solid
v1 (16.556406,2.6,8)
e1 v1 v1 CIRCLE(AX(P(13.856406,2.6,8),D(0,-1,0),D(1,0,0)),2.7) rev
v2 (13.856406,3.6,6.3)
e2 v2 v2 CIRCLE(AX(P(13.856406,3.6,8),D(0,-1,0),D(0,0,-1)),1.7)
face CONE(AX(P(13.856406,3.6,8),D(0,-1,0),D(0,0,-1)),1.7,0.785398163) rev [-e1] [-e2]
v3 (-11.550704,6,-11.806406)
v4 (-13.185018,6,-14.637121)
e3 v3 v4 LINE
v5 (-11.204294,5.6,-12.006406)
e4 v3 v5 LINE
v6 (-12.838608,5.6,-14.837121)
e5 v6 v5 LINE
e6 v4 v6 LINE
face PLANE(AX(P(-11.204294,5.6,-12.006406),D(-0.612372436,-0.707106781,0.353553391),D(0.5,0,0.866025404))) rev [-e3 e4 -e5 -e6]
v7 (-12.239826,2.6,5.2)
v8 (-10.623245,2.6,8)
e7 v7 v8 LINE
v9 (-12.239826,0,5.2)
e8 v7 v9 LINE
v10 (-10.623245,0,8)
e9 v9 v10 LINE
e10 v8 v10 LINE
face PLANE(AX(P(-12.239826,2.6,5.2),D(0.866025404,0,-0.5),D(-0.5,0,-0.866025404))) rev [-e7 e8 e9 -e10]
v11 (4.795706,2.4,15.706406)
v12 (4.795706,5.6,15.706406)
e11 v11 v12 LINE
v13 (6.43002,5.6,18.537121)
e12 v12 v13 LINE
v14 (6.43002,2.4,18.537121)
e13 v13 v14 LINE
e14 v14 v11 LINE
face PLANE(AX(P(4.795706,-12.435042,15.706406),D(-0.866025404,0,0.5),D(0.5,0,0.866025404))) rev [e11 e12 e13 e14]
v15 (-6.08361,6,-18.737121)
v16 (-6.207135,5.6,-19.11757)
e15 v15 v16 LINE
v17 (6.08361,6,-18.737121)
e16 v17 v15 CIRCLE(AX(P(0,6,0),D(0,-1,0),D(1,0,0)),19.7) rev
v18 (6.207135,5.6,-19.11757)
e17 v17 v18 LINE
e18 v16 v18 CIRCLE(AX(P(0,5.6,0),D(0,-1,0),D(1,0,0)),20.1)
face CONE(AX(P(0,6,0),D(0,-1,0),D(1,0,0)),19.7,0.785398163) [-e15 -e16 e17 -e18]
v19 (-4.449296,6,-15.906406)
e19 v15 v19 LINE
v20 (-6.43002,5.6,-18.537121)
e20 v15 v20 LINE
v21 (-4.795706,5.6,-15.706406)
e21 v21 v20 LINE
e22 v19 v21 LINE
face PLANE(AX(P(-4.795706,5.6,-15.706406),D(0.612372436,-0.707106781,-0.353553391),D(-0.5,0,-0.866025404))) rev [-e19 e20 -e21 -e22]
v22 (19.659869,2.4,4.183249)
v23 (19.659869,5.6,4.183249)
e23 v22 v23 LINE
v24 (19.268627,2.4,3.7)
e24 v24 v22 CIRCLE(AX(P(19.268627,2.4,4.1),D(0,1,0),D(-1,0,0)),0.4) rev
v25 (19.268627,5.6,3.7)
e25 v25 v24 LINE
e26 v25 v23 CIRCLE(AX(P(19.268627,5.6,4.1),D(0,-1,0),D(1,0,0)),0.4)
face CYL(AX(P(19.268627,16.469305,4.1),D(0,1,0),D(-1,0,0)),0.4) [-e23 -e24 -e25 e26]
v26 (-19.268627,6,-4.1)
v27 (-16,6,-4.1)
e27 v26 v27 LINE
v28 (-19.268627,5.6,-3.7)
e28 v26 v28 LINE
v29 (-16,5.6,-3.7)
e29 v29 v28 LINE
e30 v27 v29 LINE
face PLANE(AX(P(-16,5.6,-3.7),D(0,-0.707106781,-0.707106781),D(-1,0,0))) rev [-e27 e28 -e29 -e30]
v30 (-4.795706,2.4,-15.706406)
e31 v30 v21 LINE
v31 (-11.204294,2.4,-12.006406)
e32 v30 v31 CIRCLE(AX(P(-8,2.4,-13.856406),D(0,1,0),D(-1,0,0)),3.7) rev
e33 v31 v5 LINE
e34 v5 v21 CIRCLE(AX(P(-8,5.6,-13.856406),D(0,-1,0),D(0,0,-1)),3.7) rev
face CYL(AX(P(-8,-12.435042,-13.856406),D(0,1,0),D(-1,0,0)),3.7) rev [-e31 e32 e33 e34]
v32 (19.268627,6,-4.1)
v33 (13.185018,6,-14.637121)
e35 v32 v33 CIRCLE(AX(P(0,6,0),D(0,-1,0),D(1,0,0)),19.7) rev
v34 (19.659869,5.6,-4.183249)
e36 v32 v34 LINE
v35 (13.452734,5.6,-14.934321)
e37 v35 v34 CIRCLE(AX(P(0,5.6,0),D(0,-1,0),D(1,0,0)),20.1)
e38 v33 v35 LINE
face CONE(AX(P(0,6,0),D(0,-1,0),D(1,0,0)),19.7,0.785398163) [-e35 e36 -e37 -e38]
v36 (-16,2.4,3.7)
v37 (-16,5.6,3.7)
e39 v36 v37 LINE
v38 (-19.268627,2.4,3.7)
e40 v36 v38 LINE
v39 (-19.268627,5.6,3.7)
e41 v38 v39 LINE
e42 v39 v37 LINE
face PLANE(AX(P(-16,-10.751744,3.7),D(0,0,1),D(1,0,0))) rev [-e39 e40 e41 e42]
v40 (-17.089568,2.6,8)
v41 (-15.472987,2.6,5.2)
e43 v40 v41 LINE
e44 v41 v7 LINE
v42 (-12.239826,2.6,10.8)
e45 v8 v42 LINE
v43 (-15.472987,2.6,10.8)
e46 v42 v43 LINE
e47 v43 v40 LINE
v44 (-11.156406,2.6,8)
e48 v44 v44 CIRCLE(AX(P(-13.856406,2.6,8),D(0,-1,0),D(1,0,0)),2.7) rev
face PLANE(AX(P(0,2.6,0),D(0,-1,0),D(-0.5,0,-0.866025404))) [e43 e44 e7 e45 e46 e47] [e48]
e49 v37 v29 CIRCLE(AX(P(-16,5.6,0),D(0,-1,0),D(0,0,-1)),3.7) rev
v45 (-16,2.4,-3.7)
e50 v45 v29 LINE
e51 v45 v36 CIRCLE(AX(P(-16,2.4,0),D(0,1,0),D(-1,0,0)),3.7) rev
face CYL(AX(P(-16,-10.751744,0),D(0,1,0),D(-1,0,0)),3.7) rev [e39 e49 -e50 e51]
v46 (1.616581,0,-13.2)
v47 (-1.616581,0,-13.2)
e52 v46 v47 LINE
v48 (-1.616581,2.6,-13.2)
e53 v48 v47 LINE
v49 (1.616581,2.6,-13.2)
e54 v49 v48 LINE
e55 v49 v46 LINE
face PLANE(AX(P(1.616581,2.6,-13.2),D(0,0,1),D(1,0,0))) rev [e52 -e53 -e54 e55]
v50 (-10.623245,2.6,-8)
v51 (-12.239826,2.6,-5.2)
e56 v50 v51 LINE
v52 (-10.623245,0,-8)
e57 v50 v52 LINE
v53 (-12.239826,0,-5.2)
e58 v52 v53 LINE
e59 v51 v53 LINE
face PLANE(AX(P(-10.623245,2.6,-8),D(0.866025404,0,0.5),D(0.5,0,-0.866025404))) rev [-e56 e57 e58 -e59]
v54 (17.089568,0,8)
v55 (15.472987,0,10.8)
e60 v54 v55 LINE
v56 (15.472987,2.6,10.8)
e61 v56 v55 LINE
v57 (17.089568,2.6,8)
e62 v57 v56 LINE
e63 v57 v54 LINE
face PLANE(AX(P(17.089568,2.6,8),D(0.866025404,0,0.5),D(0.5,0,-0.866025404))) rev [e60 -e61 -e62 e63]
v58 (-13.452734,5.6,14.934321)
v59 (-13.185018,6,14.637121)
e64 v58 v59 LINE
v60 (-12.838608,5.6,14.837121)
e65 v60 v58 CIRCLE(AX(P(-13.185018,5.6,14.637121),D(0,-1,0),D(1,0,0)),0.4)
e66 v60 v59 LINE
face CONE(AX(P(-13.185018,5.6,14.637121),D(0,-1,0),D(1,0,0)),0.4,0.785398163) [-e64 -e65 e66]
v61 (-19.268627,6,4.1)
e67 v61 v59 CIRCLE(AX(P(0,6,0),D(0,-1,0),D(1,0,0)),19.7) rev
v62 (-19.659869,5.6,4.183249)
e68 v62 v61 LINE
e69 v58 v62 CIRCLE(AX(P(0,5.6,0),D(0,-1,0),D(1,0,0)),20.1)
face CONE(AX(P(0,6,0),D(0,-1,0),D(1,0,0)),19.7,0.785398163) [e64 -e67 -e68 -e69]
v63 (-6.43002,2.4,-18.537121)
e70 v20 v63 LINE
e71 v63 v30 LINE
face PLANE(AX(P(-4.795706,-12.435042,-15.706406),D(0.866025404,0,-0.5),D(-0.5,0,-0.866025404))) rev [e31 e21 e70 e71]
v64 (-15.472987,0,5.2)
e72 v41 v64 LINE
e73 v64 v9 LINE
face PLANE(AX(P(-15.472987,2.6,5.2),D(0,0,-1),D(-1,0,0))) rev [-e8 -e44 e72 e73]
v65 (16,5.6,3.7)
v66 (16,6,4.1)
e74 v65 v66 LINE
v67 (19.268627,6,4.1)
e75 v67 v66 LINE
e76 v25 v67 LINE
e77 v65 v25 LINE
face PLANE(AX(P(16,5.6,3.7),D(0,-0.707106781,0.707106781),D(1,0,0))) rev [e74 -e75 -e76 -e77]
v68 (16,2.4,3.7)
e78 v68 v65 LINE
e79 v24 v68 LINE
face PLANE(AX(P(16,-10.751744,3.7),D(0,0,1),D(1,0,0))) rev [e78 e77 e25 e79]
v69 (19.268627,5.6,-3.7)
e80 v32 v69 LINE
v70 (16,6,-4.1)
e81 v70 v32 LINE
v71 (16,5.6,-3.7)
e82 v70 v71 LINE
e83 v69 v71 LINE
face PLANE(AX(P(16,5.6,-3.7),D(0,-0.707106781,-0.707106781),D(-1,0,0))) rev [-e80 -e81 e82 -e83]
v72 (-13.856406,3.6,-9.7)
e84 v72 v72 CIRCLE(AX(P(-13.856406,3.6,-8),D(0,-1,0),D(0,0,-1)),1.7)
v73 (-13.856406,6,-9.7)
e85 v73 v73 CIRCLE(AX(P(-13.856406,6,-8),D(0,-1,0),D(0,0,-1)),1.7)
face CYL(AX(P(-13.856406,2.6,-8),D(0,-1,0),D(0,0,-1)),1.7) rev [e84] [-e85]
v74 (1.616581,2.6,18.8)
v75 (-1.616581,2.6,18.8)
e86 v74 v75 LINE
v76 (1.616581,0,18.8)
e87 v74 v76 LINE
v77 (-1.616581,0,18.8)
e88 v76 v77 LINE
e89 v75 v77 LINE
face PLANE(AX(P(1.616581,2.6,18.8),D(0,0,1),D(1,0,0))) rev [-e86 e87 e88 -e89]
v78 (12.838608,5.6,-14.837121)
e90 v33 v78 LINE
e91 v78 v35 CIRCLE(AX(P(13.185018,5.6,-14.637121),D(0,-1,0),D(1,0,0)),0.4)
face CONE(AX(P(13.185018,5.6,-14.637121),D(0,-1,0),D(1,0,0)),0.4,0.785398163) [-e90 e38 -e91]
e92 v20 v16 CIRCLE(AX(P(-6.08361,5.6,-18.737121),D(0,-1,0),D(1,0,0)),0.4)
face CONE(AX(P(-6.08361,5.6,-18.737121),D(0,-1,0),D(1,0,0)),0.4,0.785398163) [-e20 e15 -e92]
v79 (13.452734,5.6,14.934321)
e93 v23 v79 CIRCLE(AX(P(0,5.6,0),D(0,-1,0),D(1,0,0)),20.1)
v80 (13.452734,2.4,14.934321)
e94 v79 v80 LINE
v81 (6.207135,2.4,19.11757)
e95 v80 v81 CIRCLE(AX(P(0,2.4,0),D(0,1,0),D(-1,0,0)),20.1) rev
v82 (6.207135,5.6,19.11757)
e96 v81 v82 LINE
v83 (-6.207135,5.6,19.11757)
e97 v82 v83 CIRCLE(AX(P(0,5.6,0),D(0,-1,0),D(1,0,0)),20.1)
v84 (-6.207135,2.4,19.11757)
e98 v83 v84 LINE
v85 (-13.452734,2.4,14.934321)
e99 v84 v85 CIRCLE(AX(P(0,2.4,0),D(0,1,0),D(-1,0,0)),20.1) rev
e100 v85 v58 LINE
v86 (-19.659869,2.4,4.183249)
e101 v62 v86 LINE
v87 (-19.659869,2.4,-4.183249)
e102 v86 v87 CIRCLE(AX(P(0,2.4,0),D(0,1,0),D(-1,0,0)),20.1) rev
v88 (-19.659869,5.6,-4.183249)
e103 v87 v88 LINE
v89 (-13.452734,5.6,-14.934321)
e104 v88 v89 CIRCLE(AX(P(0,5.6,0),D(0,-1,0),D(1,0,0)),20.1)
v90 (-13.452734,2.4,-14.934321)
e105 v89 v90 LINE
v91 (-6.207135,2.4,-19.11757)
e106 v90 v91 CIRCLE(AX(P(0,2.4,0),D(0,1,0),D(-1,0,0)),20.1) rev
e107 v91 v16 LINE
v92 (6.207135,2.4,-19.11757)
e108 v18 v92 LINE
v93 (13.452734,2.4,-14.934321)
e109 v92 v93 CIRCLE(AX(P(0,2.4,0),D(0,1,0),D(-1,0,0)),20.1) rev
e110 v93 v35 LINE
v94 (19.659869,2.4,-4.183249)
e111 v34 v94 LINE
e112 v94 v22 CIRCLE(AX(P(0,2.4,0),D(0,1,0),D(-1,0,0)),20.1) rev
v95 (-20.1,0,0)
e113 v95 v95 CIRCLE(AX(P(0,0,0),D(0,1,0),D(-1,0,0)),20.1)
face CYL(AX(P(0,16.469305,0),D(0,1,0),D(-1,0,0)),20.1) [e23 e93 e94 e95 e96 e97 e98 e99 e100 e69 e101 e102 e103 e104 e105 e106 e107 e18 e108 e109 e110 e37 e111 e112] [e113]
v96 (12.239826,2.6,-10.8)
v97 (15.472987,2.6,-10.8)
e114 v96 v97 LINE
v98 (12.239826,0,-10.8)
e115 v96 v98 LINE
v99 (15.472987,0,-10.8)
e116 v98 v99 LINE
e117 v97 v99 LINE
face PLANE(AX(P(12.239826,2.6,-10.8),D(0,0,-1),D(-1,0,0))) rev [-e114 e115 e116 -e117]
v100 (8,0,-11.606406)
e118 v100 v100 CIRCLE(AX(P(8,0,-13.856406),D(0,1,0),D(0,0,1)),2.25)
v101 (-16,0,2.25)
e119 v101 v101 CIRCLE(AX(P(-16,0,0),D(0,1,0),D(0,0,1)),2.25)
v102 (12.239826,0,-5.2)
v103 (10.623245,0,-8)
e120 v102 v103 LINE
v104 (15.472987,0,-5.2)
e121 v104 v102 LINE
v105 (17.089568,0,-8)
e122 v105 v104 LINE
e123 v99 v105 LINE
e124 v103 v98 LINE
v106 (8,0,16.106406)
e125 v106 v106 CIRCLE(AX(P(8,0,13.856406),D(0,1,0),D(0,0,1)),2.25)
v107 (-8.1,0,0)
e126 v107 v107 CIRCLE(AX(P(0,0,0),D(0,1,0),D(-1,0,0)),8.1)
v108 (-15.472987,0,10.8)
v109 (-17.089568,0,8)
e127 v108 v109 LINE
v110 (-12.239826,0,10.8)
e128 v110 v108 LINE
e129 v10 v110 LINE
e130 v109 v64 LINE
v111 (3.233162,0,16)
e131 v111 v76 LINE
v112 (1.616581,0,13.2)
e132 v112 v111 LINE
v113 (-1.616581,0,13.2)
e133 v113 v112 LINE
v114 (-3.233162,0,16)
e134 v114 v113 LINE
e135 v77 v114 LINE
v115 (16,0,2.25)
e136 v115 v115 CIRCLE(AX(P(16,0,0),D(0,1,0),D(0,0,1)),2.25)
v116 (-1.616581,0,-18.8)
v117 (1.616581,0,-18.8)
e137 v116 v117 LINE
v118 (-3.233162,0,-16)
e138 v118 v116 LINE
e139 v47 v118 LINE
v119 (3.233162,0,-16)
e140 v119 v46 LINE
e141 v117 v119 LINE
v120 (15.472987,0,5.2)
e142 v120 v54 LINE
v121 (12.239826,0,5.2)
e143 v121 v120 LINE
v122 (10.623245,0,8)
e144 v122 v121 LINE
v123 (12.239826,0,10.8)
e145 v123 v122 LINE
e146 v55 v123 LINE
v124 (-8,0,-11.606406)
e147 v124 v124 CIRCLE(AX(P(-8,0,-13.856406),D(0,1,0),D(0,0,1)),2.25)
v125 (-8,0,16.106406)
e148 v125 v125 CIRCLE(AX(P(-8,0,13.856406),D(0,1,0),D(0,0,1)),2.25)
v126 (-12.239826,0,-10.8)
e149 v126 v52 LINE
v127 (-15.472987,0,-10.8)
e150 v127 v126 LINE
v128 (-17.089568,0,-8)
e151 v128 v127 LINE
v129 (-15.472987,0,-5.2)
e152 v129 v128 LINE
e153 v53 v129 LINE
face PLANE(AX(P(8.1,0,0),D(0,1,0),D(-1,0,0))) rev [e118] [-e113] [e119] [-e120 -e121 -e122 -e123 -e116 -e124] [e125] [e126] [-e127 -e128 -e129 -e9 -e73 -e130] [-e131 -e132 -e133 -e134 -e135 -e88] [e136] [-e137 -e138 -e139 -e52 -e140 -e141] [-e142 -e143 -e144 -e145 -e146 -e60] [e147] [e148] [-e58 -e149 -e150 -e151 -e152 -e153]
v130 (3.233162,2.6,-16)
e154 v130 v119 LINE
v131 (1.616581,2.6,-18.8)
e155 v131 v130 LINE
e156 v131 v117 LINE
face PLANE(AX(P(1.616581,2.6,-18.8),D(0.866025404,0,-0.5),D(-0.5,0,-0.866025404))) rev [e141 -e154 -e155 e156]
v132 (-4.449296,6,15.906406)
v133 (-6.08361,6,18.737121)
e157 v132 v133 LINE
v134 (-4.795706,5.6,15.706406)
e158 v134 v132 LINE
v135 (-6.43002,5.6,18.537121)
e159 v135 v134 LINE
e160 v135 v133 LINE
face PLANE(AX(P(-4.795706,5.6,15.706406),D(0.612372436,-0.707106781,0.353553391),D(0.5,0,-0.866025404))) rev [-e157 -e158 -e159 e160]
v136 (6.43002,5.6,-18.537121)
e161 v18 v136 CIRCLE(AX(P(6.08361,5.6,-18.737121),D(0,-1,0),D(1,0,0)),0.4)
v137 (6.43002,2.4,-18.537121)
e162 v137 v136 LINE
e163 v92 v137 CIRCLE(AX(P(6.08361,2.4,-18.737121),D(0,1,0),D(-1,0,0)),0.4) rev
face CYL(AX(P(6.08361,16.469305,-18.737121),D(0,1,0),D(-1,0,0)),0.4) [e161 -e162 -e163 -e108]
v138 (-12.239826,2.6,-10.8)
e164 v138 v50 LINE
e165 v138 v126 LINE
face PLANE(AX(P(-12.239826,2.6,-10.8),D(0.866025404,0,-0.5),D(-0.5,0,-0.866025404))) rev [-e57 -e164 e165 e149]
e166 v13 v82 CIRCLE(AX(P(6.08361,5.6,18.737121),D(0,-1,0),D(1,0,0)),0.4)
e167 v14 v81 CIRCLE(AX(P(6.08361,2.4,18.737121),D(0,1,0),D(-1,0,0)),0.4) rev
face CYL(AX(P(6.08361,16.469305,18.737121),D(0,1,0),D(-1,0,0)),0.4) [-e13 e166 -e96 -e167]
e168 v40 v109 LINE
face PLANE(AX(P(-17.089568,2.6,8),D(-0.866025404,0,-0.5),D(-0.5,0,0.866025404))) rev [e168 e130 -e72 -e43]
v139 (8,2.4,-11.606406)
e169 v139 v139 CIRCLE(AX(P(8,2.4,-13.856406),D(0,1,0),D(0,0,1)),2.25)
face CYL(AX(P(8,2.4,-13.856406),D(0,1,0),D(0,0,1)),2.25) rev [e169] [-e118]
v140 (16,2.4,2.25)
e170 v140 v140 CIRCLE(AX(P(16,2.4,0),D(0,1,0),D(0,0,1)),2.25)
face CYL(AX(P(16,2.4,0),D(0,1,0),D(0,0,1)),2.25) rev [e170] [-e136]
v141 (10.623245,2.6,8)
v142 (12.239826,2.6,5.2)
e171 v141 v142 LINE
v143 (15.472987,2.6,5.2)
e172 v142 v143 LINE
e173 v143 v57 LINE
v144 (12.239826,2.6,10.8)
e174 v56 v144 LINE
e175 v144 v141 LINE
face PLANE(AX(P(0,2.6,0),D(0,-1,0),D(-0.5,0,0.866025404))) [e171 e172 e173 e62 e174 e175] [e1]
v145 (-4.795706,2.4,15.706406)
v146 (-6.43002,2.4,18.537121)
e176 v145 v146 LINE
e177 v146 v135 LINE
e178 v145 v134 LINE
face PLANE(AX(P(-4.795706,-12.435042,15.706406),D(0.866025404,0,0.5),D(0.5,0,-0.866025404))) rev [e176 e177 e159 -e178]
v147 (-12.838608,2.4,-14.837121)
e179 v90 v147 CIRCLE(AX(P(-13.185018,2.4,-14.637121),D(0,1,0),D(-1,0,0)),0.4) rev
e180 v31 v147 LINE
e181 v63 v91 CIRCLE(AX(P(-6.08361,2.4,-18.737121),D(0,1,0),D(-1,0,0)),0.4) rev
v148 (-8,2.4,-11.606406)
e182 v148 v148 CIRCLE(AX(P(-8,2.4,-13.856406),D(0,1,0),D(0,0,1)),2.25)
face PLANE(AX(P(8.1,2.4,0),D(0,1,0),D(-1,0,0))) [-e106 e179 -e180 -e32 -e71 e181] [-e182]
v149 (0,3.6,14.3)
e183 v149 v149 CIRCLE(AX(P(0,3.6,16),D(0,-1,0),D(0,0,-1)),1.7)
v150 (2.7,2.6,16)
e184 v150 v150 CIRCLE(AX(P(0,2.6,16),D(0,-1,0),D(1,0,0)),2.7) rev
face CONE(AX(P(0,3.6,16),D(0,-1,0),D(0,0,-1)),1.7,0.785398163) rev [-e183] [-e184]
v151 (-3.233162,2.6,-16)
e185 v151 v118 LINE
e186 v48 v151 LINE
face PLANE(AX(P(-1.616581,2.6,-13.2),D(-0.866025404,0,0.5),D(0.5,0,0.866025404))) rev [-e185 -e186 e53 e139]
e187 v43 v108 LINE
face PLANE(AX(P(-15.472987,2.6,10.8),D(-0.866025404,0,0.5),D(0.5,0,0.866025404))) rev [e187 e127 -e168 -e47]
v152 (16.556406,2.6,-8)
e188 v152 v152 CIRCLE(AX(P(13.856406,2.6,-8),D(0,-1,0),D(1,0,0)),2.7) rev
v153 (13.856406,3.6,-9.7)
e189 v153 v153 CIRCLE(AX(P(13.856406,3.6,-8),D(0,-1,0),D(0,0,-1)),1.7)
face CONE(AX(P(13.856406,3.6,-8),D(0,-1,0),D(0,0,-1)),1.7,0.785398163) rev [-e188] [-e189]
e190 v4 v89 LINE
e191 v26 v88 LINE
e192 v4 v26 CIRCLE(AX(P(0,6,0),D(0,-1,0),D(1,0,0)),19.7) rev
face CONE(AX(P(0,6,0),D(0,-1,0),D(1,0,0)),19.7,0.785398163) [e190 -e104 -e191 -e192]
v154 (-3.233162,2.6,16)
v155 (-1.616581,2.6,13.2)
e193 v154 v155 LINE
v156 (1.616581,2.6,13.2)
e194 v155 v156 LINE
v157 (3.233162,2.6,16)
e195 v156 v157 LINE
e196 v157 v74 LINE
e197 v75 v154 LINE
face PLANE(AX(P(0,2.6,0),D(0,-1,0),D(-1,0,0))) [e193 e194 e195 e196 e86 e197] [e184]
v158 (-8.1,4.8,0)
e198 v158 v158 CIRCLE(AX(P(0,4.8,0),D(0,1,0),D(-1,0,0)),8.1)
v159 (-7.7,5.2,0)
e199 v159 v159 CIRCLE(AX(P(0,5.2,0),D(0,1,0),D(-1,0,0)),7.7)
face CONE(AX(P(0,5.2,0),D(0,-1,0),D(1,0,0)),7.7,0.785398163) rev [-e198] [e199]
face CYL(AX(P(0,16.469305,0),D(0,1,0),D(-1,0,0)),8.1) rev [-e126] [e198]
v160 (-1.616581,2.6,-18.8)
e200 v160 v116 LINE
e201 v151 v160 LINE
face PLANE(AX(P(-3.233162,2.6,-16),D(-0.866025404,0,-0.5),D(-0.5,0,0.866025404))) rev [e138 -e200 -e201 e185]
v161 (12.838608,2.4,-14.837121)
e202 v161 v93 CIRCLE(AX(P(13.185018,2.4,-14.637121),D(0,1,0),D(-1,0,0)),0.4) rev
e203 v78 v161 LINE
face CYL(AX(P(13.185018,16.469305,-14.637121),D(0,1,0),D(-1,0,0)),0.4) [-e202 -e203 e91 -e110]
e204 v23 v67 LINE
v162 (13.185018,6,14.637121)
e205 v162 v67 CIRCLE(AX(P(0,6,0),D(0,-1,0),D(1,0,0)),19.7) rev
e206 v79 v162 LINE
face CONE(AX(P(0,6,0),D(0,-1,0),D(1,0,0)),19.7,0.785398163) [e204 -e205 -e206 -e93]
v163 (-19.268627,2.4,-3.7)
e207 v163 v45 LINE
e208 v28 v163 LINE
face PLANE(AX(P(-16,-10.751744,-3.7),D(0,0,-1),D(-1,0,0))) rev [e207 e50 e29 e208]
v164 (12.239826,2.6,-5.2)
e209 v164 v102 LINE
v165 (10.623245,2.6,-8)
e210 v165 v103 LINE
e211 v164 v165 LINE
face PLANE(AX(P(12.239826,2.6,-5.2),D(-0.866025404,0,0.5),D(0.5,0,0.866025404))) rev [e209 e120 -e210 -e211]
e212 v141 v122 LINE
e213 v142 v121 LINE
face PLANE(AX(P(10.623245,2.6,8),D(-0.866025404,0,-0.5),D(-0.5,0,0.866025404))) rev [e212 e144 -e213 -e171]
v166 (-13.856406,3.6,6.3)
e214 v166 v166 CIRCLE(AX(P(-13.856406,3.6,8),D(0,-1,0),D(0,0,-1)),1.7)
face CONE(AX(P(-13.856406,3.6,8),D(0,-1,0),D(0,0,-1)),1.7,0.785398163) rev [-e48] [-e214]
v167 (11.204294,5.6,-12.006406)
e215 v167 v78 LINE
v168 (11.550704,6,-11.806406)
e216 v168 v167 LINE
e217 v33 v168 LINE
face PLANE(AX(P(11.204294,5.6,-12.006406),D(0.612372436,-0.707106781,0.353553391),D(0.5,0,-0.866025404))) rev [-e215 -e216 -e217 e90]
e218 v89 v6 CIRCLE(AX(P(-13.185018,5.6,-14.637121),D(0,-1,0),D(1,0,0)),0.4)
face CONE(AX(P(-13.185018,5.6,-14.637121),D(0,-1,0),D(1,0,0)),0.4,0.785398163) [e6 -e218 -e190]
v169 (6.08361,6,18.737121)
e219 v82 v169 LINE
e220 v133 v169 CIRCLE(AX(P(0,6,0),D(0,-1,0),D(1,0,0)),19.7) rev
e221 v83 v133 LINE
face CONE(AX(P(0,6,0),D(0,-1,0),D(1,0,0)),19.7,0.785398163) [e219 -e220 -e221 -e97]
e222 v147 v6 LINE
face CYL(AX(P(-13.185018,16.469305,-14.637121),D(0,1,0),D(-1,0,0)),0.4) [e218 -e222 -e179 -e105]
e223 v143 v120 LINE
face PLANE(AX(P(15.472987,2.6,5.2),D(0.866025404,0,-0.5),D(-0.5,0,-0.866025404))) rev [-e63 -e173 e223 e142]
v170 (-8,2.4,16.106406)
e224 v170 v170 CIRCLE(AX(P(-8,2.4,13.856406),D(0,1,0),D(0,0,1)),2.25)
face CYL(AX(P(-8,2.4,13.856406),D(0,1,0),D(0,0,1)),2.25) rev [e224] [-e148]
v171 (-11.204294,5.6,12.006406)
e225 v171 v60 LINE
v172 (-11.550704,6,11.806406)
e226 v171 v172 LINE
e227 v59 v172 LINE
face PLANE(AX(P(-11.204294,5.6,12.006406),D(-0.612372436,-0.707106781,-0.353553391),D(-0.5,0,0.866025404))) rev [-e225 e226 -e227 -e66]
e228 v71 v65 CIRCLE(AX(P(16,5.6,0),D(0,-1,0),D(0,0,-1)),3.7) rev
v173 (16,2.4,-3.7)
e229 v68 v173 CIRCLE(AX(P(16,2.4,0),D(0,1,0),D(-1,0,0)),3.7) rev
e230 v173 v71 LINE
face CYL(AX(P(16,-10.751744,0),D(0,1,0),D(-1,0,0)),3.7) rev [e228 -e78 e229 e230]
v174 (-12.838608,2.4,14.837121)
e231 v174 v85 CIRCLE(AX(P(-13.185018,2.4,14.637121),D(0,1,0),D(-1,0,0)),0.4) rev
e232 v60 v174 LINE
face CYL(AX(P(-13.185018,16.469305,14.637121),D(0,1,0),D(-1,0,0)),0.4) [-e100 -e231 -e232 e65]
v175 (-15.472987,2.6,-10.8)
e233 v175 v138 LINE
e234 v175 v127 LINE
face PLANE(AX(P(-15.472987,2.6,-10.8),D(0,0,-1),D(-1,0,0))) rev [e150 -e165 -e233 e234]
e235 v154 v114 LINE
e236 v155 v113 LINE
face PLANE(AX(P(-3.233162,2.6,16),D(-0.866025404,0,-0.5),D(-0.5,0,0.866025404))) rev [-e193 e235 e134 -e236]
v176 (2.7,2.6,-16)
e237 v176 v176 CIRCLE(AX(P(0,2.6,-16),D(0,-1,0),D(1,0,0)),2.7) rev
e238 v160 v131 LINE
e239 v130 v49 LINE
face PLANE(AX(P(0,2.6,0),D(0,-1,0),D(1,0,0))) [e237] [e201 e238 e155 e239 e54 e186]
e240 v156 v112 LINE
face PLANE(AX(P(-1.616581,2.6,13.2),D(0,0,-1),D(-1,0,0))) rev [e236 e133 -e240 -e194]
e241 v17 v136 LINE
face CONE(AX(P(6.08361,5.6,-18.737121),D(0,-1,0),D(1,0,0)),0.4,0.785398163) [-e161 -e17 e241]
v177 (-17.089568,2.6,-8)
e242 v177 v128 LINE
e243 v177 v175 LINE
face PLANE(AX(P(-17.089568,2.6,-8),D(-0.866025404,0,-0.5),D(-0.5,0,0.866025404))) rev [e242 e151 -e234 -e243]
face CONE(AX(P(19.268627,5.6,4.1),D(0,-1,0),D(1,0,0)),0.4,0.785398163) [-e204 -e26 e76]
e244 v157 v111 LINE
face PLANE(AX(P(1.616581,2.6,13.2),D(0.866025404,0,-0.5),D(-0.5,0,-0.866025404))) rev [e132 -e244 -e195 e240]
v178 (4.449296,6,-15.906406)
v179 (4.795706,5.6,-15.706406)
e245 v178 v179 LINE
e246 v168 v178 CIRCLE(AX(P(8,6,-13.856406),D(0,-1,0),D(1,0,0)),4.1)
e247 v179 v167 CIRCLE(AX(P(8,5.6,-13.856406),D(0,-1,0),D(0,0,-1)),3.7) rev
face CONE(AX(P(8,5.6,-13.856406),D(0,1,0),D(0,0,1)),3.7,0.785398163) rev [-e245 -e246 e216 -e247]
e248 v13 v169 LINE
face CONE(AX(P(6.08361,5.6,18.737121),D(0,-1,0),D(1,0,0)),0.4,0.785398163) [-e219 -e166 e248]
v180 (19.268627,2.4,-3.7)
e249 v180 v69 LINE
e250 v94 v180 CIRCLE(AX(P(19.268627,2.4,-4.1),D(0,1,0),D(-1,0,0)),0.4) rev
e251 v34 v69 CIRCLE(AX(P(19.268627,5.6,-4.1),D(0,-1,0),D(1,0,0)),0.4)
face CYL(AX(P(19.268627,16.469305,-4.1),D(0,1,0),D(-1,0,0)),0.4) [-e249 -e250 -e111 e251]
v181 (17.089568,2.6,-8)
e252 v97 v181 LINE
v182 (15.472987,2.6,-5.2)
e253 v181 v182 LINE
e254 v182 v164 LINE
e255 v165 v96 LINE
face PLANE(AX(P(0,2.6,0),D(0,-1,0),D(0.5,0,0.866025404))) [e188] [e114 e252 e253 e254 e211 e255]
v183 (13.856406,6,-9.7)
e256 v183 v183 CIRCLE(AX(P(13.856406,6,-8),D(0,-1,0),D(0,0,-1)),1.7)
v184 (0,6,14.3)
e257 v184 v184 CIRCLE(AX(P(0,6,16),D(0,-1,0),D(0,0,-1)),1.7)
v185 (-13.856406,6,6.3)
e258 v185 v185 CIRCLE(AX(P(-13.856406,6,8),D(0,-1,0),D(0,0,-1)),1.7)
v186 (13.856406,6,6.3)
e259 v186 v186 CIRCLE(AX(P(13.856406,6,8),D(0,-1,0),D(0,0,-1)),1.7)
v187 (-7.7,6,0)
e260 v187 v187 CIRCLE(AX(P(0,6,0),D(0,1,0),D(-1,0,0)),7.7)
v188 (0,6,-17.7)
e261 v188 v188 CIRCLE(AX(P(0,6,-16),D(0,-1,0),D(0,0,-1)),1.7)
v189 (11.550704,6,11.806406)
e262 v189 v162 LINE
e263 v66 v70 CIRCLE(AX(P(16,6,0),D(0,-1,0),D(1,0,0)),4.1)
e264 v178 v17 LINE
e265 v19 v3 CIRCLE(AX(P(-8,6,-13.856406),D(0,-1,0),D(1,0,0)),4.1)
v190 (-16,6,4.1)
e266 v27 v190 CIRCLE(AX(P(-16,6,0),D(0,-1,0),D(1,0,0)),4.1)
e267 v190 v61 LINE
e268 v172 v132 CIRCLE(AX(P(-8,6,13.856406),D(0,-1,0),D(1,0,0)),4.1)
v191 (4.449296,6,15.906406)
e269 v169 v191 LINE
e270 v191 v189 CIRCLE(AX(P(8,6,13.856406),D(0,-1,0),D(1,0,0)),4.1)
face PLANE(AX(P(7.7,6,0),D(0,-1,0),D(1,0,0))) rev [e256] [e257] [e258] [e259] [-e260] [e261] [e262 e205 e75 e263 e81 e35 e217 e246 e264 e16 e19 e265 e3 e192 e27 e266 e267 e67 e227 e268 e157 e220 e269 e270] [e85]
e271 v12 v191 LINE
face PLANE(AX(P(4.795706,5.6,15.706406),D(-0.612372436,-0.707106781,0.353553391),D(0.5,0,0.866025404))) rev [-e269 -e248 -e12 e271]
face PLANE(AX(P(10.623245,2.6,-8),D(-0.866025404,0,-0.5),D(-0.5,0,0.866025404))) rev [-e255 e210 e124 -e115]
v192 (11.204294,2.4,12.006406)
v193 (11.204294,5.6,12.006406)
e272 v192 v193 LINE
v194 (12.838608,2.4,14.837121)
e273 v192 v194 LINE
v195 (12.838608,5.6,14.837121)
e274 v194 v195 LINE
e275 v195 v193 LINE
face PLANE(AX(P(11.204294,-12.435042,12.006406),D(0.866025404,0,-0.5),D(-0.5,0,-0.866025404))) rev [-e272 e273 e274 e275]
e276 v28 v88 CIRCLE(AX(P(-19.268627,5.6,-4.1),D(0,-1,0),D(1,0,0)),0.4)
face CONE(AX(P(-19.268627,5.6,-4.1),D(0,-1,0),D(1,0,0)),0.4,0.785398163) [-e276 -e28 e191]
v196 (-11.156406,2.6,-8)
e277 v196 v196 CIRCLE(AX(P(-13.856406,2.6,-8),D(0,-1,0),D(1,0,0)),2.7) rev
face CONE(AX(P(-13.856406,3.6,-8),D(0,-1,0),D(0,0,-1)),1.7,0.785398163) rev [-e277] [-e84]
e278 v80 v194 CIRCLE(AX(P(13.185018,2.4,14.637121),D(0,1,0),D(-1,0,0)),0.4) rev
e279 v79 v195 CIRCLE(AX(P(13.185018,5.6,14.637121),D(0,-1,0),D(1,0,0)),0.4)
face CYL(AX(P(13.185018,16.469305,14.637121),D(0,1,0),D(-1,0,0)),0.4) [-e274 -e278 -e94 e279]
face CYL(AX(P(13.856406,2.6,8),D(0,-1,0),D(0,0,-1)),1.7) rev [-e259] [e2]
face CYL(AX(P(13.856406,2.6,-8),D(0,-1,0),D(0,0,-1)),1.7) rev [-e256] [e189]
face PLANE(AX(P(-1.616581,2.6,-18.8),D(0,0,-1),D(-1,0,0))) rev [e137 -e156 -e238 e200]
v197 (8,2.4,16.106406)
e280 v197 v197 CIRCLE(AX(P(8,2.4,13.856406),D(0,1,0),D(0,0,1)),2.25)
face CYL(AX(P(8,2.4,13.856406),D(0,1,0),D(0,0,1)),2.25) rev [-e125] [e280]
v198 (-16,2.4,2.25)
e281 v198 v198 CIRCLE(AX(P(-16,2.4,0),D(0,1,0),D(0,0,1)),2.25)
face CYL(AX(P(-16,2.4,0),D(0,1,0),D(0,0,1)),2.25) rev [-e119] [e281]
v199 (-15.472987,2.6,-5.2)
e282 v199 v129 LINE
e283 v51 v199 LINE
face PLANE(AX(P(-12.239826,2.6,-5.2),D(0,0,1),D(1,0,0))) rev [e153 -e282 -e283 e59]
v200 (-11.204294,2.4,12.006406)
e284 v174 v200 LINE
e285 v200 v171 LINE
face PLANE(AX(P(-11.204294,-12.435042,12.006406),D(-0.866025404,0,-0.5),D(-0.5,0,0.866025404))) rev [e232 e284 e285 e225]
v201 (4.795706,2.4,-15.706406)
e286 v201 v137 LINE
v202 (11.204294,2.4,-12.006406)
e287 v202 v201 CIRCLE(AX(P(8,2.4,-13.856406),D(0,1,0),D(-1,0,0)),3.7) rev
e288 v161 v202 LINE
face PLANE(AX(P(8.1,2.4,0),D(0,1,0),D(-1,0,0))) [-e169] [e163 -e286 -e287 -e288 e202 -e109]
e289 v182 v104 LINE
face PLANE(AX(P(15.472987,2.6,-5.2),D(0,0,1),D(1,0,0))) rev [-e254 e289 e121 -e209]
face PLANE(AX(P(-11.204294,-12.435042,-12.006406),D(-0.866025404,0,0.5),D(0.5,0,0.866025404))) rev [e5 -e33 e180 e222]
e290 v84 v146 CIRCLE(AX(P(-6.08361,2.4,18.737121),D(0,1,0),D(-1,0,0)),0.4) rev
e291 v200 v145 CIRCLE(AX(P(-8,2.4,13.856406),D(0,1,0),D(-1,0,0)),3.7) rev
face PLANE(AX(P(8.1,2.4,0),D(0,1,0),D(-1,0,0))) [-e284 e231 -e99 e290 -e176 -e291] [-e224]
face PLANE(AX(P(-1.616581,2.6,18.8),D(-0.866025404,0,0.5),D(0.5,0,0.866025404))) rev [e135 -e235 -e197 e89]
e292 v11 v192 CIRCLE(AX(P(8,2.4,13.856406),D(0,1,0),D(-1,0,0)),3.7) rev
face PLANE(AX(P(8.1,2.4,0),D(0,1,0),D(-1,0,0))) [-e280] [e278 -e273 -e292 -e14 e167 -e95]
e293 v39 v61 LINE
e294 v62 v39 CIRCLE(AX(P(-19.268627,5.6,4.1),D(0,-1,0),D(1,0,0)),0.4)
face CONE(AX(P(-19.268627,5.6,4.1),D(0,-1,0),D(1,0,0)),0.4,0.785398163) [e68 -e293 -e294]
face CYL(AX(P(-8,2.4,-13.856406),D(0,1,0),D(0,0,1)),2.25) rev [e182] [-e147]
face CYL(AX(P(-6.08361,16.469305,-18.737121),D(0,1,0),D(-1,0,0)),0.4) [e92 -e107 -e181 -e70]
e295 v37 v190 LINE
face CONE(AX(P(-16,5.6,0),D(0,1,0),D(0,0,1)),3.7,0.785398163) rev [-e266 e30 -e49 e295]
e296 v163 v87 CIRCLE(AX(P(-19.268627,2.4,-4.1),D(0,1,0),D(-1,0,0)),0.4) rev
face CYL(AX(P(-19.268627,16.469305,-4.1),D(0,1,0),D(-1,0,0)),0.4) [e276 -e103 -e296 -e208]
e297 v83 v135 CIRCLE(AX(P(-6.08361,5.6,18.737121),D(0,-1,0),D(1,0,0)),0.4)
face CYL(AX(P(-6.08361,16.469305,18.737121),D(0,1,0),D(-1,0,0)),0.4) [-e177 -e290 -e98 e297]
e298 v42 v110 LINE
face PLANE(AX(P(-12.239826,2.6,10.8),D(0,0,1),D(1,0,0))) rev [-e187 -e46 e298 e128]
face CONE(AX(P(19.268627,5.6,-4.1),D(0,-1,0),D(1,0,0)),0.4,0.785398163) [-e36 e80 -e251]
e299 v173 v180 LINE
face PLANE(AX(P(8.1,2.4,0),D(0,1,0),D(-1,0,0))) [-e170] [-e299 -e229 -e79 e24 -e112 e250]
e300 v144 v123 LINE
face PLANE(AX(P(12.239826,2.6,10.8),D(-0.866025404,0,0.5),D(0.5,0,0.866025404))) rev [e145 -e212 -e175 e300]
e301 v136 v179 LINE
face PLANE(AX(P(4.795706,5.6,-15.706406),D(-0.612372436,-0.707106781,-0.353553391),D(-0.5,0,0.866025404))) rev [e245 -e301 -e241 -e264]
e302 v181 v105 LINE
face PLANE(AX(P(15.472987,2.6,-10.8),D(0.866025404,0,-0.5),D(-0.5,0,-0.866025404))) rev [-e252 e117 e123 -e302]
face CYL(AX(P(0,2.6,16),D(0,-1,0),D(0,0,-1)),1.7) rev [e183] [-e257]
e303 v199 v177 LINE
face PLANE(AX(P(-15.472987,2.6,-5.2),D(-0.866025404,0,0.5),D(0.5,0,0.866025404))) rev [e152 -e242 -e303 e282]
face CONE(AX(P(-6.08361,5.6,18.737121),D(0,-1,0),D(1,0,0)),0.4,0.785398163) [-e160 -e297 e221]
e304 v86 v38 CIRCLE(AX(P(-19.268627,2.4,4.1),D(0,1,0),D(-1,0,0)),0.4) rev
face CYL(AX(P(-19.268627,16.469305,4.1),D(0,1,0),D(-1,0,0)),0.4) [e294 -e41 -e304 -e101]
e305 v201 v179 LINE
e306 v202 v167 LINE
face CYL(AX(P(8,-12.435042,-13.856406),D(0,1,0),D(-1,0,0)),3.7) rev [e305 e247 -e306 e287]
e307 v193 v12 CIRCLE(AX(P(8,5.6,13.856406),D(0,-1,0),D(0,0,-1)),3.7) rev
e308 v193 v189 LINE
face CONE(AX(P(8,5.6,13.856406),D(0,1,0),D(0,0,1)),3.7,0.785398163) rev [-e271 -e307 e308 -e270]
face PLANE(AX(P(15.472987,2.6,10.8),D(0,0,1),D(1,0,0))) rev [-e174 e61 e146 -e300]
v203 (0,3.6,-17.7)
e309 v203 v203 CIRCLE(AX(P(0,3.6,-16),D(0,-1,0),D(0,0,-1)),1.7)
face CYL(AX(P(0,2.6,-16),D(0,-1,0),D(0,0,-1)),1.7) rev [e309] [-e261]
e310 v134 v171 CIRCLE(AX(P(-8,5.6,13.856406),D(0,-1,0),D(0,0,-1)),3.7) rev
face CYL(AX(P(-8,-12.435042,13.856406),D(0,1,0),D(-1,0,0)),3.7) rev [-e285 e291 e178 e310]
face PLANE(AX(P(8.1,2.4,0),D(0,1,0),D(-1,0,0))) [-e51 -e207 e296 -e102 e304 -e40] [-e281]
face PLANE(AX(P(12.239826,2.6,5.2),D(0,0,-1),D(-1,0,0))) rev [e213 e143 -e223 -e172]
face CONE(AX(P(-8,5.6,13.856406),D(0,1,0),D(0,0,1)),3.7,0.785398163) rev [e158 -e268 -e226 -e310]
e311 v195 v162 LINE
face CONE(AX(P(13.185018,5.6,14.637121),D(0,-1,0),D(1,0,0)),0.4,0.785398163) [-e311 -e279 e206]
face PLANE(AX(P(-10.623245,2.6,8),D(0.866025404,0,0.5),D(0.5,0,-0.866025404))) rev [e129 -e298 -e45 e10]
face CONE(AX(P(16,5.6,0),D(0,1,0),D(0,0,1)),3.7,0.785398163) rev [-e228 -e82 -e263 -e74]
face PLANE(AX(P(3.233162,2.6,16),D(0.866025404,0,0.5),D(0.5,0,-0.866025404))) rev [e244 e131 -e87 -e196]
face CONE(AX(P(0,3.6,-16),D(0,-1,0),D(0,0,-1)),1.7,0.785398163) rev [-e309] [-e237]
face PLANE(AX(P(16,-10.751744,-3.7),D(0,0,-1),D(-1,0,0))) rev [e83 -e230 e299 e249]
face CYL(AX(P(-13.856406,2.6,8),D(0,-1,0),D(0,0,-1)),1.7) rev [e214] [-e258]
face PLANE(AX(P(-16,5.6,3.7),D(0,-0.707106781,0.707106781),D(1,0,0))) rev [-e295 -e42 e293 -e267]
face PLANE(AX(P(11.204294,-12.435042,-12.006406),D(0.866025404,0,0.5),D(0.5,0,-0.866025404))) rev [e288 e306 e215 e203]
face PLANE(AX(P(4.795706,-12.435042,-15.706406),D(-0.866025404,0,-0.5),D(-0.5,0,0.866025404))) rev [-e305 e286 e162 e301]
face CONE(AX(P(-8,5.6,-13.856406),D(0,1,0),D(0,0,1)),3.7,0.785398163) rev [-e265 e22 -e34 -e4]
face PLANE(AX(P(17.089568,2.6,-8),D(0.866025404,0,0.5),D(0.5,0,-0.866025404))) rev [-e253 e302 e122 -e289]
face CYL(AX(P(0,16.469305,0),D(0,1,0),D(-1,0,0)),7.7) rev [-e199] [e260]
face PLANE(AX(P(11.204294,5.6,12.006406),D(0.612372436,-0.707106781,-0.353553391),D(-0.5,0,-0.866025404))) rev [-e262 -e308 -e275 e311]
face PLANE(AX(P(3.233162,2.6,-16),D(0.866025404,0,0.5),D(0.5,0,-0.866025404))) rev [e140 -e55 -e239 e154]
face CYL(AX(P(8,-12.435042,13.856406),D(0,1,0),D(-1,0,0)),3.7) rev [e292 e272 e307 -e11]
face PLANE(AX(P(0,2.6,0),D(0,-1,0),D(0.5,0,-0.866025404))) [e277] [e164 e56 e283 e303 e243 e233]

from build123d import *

# Parameters (mm, degrees)
CUT_EXTRUDE1_DEPTH           = 3.6
M4_CLEARANCE_HOLE1_D         = 4.5
CUT_EXTRUDE2_DEPTH           = 2.6
M3_CLEARANCE_HOLE2_D         = 3.4
FILLET1_R                    = 0.4
CHAMFER1_SIZE                = 1
CIRPATTERN1_COUNT            = 6
FILLET1_OF_CIRPATTERN1_R     = 0.4
CHAMFER1_OF_CIRPATTERN1_SIZE = 1
CHAMFER2_SIZE                = 0.4


with BuildPart() as part:
    # Sketch1 → Revolve1 (revolve)
    with BuildSketch(Plane.XY, mode=Mode.PRIVATE) as revolve1_sk:
        Polygon((8.1, 0), (20.1, 0), (20.1, 6), (7.7, 6), (7.7, 5.2), (8.1, 4.8), align=None)
    revolve(revolve1_sk.sketch.rotate(Axis((0, 16.469304641, 0), (0, -1, 0)), 180), axis=Axis((0, 16.469304641, 0), (0, -1, 0)))

    # Sketch2 → Cut-Extrude1 (cut)
    with BuildSketch(Plane(origin=(0, 6, 0), x_dir=(1, 0, 0), z_dir=(0, 1, 0))):
        with BuildLine():
            Line((16, 3.7), (19.756517912, 3.7))
            ThreePointArc((19.756517912, 3.7), (20.1, 0), (19.756517912, -3.7))
            Line((19.756517912, -3.7), (16, -3.7))
            ThreePointArc((16, -3.7), (12.3, 0), (16, 3.7))
        make_face()
    cut_extrude1 = extrude(amount=-CUT_EXTRUDE1_DEPTH, mode=Mode.SUBTRACT)

    # M4 Clearance Hole1 (through all)
    with Locations(Plane(origin=(0, 2.4, 0), x_dir=(1, 0, 0), z_dir=(0, 1, 0))):
        with Locations((16, 0)):
            m4_clearance_hole1 = Hole(M4_CLEARANCE_HOLE1_D / 2)

    # Sketch8 → Cut-Extrude2 (cut)
    with BuildSketch(Plane.XZ):
        Polygon((3.233161507, -16), (1.616580754, -13.2), (-1.616580754, -13.2), (-3.233161507, -16), (-1.616580754, -18.8), (1.616580754, -18.8), align=None)
    cut_extrude2 = extrude(amount=-CUT_EXTRUDE2_DEPTH, mode=Mode.SUBTRACT)

    # M3 Clearance Hole2 (through all)
    with Locations(Plane(origin=(0, 2.6, 0), x_dir=(-1, 0, 0), z_dir=(0, -1, 0))):
        with Locations((0, 16)):
            m3_clearance_hole2 = Hole(M3_CLEARANCE_HOLE2_D / 2)

    # Fillet1
    fillet1_edges = [part.edges().sort_by_distance(p)[0] for p in [
        (19.756517912, 4.2, -3.7),
        (19.756517912, 4.2, 3.7),
    ]]
    fillet(fillet1_edges, radius=FILLET1_R)

    # Chamfer1
    chamfer1_edges = [part.edges().sort_by_distance(p)[0] for p in [
        (-1.7, 2.6, -16),
    ]]
    chamfer(chamfer1_edges, length=CHAMFER1_SIZE)

    # CirPattern1: Cut-Extrude1, M4 Clearance Hole1, Cut-Extrude2, M3 Clearance Hole2 ×6 about axis
    cirpattern1_axis = Axis((0, 0, 0), (0, 1, 0))
    add([cut_extrude1.rotate(cirpattern1_axis, i * 360 / CIRPATTERN1_COUNT) for i in range(1, CIRPATTERN1_COUNT)], mode=Mode.SUBTRACT)
    add([m4_clearance_hole1.rotate(cirpattern1_axis, i * 360 / CIRPATTERN1_COUNT) for i in range(1, CIRPATTERN1_COUNT)], mode=Mode.SUBTRACT)
    add([cut_extrude2.rotate(cirpattern1_axis, i * 360 / CIRPATTERN1_COUNT) for i in range(1, CIRPATTERN1_COUNT)], mode=Mode.SUBTRACT)
    add([m3_clearance_hole2.rotate(cirpattern1_axis, i * 360 / CIRPATTERN1_COUNT) for i in range(1, CIRPATTERN1_COUNT)], mode=Mode.SUBTRACT)

    # Fillet1 of CirPattern1
    fillet1_of_cirpattern1_edges = [part.edges().sort_by_distance(p)[0] for p in [
        (6.673964962, 4.2, -18.959646402),
        (13.08255295, 4.2, -15.259646402),
        (-13.08255295, 4.2, -15.259646402),
        (-6.673964962, 4.2, -18.959646402),
        (-19.756517912, 4.2, 3.7),
        (-19.756517912, 4.2, -3.7),
        (-6.673964962, 4.2, 18.959646402),
        (-13.08255295, 4.2, 15.259646402),
        (13.08255295, 4.2, 15.259646402),
        (6.673964962, 4.2, 18.959646402),
    ]]
    fillet(fillet1_of_cirpattern1_edges, radius=FILLET1_OF_CIRPATTERN1_R)

    # Chamfer1 of CirPattern1
    chamfer1_of_cirpattern1_edges = [part.edges().sort_by_distance(p)[0] for p in [
        (-14.706406461, 2.6, -6.527756814),
        (-13.006406461, 2.6, 9.472243186),
        (1.7, 2.6, 16),
        (14.706406461, 2.6, 6.527756814),
        (13.006406461, 2.6, -9.472243186),
    ]]
    chamfer(chamfer1_of_cirpattern1_edges, length=CHAMFER1_OF_CIRPATTERN1_SIZE)

    # Chamfer2
    chamfer2_edges = [part.edges().sort_by_distance(p)[0] for p in [
        (6.15, 6, 10.652112467),
        (5.612862844, 6, 17.121763621),
        (-6.15, 6, 10.652112467),
        (-12.021450832, 6, 13.421763621),
        (-12.3, 6, 0),
        (-17.634313676, 6, -3.7),
        (-6.15, 6, -10.652112467),
        (-5.612862844, 6, -17.121763621),
        (6.15, 6, -10.652112467),
        (12.021450832, 6, -13.421763621),
        (12.3, 6, 0),
        (17.634313676, 6, 3.7),
        (5.612862844, 6, -17.121763621),
        (0, 6, -20.1),
        (13.122486484, 6, -15.032202838),
        (6.45702629, 6, -18.880508075),
        (-12.021450832, 6, -13.421763621),
        (-17.407110616, 6, -10.05),
        (-6.45702629, 6, -18.880508075),
        (-13.122486484, 6, -15.032202838),
        (-17.634313676, 6, 3.7),
        (-17.407110616, 6, 10.05),
        (-19.579512774, 6, -3.848305237),
        (-19.579512774, 6, 3.848305237),
        (-5.612862844, 6, 17.121763621),
        (0, 6, 20.1),
        (-13.122486484, 6, 15.032202838),
        (-6.45702629, 6, 18.880508075),
        (12.021450832, 6, 13.421763621),
        (17.407110616, 6, 10.05),
        (6.45702629, 6, 18.880508075),
        (13.122486484, 6, 15.032202838),
        (17.634313676, 6, -3.7),
        (17.407110616, 6, -10.05),
        (19.579512774, 6, 3.848305237),
        (19.579512774, 6, -3.848305237),
    ]]
    chamfer(chamfer2_edges, length=CHAMFER2_SIZE - 0.0001)  # a hair under: the kernel refuses the full size


solid = part.part
